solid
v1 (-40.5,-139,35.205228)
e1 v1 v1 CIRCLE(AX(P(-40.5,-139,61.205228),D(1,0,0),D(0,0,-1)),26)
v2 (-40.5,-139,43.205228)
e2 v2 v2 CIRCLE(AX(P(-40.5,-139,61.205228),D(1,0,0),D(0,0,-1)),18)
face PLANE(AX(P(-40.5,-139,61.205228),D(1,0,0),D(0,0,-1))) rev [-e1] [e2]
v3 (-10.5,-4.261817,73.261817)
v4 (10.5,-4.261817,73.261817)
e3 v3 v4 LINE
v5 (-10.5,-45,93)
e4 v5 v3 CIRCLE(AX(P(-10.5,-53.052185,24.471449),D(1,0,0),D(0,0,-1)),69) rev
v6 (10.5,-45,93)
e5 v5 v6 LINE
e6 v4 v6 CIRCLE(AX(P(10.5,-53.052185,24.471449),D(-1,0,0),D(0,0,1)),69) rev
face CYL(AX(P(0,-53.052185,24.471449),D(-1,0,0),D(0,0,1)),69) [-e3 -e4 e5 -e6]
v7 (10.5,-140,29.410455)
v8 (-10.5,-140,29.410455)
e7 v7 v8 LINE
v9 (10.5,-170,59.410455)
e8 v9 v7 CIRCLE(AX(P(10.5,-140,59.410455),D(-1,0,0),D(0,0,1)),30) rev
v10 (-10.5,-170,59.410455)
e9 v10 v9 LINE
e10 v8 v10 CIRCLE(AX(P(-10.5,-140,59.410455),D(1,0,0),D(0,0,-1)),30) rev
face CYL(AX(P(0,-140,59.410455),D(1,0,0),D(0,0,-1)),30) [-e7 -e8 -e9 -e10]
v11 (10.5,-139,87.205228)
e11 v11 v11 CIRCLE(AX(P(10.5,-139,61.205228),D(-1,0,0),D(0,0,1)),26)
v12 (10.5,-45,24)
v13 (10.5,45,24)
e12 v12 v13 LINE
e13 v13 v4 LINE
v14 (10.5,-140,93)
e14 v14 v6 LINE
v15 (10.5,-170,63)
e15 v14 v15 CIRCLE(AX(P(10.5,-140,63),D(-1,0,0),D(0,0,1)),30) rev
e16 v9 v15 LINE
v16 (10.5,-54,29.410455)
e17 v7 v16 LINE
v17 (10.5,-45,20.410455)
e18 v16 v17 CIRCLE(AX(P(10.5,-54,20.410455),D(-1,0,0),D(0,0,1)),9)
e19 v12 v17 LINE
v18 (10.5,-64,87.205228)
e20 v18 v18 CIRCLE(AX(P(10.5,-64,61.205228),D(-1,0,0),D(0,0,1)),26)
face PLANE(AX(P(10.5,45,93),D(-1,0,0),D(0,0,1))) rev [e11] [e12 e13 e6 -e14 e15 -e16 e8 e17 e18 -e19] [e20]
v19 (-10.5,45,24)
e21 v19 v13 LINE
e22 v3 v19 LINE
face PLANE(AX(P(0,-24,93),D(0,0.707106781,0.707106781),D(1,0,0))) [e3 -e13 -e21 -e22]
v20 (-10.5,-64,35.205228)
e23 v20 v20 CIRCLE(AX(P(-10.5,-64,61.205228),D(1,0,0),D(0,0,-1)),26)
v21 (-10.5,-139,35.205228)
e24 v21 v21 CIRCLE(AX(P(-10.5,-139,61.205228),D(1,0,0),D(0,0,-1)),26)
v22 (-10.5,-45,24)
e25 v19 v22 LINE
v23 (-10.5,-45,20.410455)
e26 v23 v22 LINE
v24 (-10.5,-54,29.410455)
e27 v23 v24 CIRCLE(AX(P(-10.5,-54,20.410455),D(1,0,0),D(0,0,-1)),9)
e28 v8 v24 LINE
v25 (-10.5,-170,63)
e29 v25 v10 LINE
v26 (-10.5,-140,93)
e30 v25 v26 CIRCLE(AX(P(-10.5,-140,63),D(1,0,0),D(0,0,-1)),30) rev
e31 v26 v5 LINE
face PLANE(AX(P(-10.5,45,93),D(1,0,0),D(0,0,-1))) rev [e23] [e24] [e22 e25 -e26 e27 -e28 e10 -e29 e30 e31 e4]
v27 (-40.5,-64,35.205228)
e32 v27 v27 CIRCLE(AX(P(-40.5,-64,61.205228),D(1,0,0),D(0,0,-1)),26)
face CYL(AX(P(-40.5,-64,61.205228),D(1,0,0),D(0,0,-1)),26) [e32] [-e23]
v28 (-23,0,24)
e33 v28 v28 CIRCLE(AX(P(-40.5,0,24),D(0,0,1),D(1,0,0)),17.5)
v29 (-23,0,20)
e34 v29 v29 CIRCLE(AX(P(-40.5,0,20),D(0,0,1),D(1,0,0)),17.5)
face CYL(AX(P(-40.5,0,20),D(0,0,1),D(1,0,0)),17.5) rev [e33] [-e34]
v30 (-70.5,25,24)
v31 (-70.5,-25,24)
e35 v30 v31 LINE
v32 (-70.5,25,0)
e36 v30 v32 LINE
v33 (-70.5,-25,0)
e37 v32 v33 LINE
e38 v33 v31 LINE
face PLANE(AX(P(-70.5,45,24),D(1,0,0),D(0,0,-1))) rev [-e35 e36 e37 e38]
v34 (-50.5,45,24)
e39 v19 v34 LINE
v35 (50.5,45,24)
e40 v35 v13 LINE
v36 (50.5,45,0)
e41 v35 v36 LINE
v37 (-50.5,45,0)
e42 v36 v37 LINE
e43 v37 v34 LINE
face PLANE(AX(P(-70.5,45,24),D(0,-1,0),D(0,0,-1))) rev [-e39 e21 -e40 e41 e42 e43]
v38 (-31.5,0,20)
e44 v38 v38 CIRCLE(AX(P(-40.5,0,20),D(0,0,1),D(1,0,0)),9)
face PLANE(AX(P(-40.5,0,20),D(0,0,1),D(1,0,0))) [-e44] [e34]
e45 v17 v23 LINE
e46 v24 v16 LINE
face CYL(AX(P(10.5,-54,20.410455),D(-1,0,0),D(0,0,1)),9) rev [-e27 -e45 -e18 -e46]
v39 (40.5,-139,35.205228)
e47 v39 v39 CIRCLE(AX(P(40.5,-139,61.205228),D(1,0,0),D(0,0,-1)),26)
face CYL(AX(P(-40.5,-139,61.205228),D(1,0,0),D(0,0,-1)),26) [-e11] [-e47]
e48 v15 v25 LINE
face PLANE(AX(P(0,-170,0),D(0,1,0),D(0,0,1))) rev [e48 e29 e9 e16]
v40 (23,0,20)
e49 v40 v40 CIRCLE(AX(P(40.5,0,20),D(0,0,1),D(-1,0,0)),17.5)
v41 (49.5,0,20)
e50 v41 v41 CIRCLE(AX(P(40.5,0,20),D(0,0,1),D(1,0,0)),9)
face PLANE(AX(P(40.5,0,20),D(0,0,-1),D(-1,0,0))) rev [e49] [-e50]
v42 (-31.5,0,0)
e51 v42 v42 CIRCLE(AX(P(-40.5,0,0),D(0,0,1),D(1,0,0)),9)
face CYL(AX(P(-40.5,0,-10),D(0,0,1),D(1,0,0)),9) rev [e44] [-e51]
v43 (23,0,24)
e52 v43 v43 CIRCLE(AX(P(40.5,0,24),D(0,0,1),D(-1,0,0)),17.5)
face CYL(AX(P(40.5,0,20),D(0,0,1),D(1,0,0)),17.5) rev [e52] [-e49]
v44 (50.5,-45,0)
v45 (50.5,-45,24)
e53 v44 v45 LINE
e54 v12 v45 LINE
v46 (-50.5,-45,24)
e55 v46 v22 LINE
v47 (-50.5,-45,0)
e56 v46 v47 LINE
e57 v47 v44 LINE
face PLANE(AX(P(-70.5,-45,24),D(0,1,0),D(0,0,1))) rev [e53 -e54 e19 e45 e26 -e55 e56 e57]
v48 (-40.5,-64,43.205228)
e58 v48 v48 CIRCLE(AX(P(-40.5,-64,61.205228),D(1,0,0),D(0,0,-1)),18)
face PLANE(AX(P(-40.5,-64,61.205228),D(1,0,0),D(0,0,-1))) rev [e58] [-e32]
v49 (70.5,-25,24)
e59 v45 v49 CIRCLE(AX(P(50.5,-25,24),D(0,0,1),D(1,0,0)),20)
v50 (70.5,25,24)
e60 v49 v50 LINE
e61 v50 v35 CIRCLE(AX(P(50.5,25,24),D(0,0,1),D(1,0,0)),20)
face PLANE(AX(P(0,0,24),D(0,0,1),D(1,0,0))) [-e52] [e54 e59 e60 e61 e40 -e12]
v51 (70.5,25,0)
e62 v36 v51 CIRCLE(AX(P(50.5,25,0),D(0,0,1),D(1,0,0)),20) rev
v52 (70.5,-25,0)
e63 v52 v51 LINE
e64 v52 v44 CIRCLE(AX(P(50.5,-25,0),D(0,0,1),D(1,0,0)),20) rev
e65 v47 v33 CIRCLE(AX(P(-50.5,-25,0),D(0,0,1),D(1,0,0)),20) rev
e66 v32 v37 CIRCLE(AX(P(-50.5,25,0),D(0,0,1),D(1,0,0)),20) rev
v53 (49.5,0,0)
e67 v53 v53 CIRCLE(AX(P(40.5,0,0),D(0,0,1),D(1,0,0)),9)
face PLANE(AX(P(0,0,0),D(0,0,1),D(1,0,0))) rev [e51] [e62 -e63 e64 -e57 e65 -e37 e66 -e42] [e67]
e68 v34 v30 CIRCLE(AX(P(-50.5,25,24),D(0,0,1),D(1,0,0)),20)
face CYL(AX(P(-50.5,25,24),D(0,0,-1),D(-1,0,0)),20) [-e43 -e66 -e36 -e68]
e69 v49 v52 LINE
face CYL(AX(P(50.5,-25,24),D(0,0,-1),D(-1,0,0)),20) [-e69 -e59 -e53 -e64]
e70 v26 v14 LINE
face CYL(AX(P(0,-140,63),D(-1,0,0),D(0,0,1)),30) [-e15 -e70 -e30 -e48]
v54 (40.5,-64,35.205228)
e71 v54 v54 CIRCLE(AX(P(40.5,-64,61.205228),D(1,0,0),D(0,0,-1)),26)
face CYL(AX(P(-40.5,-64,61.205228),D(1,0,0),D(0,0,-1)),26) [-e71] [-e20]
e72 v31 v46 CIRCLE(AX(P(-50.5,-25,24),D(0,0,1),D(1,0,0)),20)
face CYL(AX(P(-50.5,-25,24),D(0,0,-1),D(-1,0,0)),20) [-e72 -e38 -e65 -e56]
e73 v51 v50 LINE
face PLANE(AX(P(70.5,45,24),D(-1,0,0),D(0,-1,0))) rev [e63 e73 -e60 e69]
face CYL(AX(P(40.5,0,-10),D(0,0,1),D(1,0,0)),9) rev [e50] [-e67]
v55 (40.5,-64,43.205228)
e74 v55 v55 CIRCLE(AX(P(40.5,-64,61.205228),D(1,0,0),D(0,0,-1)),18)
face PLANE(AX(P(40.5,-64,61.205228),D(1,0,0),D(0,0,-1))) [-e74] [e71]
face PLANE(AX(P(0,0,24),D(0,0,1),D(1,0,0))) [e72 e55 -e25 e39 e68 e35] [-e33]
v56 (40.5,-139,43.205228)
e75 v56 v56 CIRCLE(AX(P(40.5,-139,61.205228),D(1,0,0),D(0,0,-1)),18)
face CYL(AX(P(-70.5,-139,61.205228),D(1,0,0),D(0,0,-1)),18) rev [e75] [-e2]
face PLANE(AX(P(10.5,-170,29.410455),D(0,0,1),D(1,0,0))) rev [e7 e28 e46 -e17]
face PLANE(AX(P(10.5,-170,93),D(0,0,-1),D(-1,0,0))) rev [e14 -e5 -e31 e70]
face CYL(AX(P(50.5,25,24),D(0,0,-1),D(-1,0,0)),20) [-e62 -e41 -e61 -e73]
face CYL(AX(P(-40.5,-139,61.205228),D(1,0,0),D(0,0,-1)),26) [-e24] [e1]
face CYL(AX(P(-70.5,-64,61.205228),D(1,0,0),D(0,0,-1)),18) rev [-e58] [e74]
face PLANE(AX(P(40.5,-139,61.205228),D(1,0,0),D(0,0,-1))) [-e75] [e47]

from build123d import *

# Parameters (mm, degrees)
CROQUIS2_W                   = 141
CROQUIS2_H                   = 90
SALIENTE_EXTRUIR1_DEPTH      = 24
REDONDEO1_R                  = 20
CROQUIS3_R                   = 17.5
CORTAR_EXTRUIR1_DEPTH        = 4
CROQUIS5_W                   = 21
CROQUIS5_H                   = 90
SALIENTE_EXTRUIR2_DEPTH      = 69
CHAFL_N1_SIZE                = 69
REDONDEO4_R                  = 69
CROQUIS10_W                  = 21
CROQUIS10_H                  = 63.589544636
SALIENTE_EXTRUIR6_DEPTH      = 125
REDONDEO6_R                  = 9
REDONDEO7_R                  = 30
SALIENTE_EXTRUIR8_DEPTH      = 30
SALIENTE_EXTRUIR8_DEPTH_BACK = 51
CROQUIS11_R                  = 26
CROQUIS15_R                  = 18
CORTAR_EXTRUIR3_DEPTH        = 224.315919719
CROQUIS16_R                  = 18
CORTAR_EXTRUIR4_DEPTH        = 224.315919719
CROQUIS17_R                  = 9
CORTAR_EXTRUIR5_DEPTH        = 30
CROQUIS18_R                  = 9
CORTAR_EXTRUIR6_DEPTH        = 30


with BuildPart() as part:
    # Croquis2 → Saliente-Extruir1 (new body)
    with BuildSketch(Plane.XY):
        Rectangle(CROQUIS2_W, CROQUIS2_H)
    extrude(amount=SALIENTE_EXTRUIR1_DEPTH)

    # Redondeo1
    redondeo1_edges = [part.edges().sort_by_distance(p)[0] for p in [
        (70.5, -45, 12),
        (-70.5, -45, 12),
        (-70.5, 45, 12),
        (70.5, 45, 12),
    ]]
    fillet(redondeo1_edges, radius=REDONDEO1_R)

    # Croquis3 → Cortar-Extruir1 (cut)
    with BuildSketch(Plane.XY.offset(24)):
        with Locations((-40.5, 0)):
            Circle(CROQUIS3_R)
        with Locations(Location((40.5, 0, 0), (0, 0, 180))):
            Circle(CROQUIS3_R)
    extrude(amount=-CORTAR_EXTRUIR1_DEPTH, mode=Mode.SUBTRACT)

    # Croquis5 → Saliente-Extruir2 (add)
    with BuildSketch(Plane.XY.offset(24)):
        Rectangle(CROQUIS5_W, CROQUIS5_H)
    extrude(amount=SALIENTE_EXTRUIR2_DEPTH)

    # Chaflán1
    chafl_n1_edges = [part.edges().sort_by_distance(p)[0] for p in [
        (0, 45, 93),
    ]]
    chamfer(chafl_n1_edges, length=CHAFL_N1_SIZE)

    # Redondeo4
    # the kernel refuses this fillet: 69 mm, written as the material it takes off along each edge
    with BuildSketch(Plane(origin=(-80.285016103, -24, 93), x_dir=(0, 0.7071067811865477, -0.7071067811865474), z_dir=(1, 0, 0))) as redondeo4_piece_1:
        with BuildLine():
            CenterArc((27.914006441, -69), REDONDEO4_R, 90, 38.298408264)
            Line((-14.849242405, -14.849242405), (-15.704507382, -13.766227253))
            ThreePointArc((-15.704507382, -13.766227253), (-8.40042856, -6.448813844), (-0.975807358, 0.975807358))
            Line((-0.975807358, 0.975807358), (0, 1.38))
            Line((0, 1.38), (27.914006441, 1.38))
            Line((27.914006441, 1.38), (27.914006441, 0))
        make_face()
    extrude(amount=160.570032206, mode=Mode.SUBTRACT)

    # Croquis10 → Saliente-Extruir6 (add)
    with BuildSketch(Plane(origin=(0, -45, 0), x_dir=(-1, 0, 0), z_dir=(0, -1, 0))):
        with Locations((0, -61.205227682)):
            Rectangle(CROQUIS10_W, CROQUIS10_H)
    extrude(amount=SALIENTE_EXTRUIR6_DEPTH)

    # Redondeo6
    # the kernel refuses this fillet: 9 mm, written as the material it adds along each edge
    with BuildSketch(Plane(origin=(-10.5, -45, 29.410455364), x_dir=(0, 0, -1), z_dir=(1, 0, 0))) as redondeo6_piece_1:
        with BuildLine():
            CenterArc((REDONDEO6_R, -REDONDEO6_R), REDONDEO6_R, 90, 90)
            Line((0, -REDONDEO6_R), (0, 0))
            Line((0, 0), (REDONDEO6_R, 0))
        make_face()
    extrude(amount=21)

    # Redondeo7
    redondeo7_edges = [part.edges().sort_by_distance(p)[0] for p in [
        (0, -170, 93),
        (0, -170, 29.410455364),
    ]]
    fillet(redondeo7_edges, radius=REDONDEO7_R)

    # Croquis11 → Saliente-Extruir8 (add, two sides: drawn at the far end of the back side and taken through both)
    with BuildSketch(Plane(origin=(10.5, 0, 0), x_dir=(0, 0, -1), z_dir=(1, 0, 0)).offset(-SALIENTE_EXTRUIR8_DEPTH_BACK)):
        with Locations((-61.205227682, -64)):
            Circle(CROQUIS11_R)
        with Locations((-61.205227682, -139)):
            Circle(CROQUIS11_R)
    extrude(amount=SALIENTE_EXTRUIR8_DEPTH + SALIENTE_EXTRUIR8_DEPTH_BACK)

    # Croquis15 → Cortar-Extruir3 (cut, through all)
    with BuildSketch(Plane(origin=(40.5, 0, 0), x_dir=(0, 0, -1), z_dir=(1, 0, 0))):
        with Locations((-61.205227682, -64)):
            Circle(CROQUIS15_R)
    extrude(amount=-CORTAR_EXTRUIR3_DEPTH, mode=Mode.SUBTRACT)

    # Croquis16 → Cortar-Extruir4 (cut, through all)
    with BuildSketch(Plane(origin=(40.5, 0, 0), x_dir=(0, 0, -1), z_dir=(1, 0, 0))):
        with Locations((-61.205227682, -139)):
            Circle(CROQUIS16_R)
    extrude(amount=-CORTAR_EXTRUIR4_DEPTH, mode=Mode.SUBTRACT)

    # Croquis17 → Cortar-Extruir5 (cut)
    with BuildSketch(Plane.XY.offset(20)):
        with Locations((40.5, 0)):
            Circle(CROQUIS17_R)
    extrude(amount=-CORTAR_EXTRUIR5_DEPTH, mode=Mode.SUBTRACT)

    # Croquis18 → Cortar-Extruir6 (cut)
    with BuildSketch(Plane.XY.offset(20)):
        with Locations((-40.5, 0)):
            Circle(CROQUIS18_R)
    extrude(amount=-CORTAR_EXTRUIR6_DEPTH, mode=Mode.SUBTRACT)


solid = part.part
